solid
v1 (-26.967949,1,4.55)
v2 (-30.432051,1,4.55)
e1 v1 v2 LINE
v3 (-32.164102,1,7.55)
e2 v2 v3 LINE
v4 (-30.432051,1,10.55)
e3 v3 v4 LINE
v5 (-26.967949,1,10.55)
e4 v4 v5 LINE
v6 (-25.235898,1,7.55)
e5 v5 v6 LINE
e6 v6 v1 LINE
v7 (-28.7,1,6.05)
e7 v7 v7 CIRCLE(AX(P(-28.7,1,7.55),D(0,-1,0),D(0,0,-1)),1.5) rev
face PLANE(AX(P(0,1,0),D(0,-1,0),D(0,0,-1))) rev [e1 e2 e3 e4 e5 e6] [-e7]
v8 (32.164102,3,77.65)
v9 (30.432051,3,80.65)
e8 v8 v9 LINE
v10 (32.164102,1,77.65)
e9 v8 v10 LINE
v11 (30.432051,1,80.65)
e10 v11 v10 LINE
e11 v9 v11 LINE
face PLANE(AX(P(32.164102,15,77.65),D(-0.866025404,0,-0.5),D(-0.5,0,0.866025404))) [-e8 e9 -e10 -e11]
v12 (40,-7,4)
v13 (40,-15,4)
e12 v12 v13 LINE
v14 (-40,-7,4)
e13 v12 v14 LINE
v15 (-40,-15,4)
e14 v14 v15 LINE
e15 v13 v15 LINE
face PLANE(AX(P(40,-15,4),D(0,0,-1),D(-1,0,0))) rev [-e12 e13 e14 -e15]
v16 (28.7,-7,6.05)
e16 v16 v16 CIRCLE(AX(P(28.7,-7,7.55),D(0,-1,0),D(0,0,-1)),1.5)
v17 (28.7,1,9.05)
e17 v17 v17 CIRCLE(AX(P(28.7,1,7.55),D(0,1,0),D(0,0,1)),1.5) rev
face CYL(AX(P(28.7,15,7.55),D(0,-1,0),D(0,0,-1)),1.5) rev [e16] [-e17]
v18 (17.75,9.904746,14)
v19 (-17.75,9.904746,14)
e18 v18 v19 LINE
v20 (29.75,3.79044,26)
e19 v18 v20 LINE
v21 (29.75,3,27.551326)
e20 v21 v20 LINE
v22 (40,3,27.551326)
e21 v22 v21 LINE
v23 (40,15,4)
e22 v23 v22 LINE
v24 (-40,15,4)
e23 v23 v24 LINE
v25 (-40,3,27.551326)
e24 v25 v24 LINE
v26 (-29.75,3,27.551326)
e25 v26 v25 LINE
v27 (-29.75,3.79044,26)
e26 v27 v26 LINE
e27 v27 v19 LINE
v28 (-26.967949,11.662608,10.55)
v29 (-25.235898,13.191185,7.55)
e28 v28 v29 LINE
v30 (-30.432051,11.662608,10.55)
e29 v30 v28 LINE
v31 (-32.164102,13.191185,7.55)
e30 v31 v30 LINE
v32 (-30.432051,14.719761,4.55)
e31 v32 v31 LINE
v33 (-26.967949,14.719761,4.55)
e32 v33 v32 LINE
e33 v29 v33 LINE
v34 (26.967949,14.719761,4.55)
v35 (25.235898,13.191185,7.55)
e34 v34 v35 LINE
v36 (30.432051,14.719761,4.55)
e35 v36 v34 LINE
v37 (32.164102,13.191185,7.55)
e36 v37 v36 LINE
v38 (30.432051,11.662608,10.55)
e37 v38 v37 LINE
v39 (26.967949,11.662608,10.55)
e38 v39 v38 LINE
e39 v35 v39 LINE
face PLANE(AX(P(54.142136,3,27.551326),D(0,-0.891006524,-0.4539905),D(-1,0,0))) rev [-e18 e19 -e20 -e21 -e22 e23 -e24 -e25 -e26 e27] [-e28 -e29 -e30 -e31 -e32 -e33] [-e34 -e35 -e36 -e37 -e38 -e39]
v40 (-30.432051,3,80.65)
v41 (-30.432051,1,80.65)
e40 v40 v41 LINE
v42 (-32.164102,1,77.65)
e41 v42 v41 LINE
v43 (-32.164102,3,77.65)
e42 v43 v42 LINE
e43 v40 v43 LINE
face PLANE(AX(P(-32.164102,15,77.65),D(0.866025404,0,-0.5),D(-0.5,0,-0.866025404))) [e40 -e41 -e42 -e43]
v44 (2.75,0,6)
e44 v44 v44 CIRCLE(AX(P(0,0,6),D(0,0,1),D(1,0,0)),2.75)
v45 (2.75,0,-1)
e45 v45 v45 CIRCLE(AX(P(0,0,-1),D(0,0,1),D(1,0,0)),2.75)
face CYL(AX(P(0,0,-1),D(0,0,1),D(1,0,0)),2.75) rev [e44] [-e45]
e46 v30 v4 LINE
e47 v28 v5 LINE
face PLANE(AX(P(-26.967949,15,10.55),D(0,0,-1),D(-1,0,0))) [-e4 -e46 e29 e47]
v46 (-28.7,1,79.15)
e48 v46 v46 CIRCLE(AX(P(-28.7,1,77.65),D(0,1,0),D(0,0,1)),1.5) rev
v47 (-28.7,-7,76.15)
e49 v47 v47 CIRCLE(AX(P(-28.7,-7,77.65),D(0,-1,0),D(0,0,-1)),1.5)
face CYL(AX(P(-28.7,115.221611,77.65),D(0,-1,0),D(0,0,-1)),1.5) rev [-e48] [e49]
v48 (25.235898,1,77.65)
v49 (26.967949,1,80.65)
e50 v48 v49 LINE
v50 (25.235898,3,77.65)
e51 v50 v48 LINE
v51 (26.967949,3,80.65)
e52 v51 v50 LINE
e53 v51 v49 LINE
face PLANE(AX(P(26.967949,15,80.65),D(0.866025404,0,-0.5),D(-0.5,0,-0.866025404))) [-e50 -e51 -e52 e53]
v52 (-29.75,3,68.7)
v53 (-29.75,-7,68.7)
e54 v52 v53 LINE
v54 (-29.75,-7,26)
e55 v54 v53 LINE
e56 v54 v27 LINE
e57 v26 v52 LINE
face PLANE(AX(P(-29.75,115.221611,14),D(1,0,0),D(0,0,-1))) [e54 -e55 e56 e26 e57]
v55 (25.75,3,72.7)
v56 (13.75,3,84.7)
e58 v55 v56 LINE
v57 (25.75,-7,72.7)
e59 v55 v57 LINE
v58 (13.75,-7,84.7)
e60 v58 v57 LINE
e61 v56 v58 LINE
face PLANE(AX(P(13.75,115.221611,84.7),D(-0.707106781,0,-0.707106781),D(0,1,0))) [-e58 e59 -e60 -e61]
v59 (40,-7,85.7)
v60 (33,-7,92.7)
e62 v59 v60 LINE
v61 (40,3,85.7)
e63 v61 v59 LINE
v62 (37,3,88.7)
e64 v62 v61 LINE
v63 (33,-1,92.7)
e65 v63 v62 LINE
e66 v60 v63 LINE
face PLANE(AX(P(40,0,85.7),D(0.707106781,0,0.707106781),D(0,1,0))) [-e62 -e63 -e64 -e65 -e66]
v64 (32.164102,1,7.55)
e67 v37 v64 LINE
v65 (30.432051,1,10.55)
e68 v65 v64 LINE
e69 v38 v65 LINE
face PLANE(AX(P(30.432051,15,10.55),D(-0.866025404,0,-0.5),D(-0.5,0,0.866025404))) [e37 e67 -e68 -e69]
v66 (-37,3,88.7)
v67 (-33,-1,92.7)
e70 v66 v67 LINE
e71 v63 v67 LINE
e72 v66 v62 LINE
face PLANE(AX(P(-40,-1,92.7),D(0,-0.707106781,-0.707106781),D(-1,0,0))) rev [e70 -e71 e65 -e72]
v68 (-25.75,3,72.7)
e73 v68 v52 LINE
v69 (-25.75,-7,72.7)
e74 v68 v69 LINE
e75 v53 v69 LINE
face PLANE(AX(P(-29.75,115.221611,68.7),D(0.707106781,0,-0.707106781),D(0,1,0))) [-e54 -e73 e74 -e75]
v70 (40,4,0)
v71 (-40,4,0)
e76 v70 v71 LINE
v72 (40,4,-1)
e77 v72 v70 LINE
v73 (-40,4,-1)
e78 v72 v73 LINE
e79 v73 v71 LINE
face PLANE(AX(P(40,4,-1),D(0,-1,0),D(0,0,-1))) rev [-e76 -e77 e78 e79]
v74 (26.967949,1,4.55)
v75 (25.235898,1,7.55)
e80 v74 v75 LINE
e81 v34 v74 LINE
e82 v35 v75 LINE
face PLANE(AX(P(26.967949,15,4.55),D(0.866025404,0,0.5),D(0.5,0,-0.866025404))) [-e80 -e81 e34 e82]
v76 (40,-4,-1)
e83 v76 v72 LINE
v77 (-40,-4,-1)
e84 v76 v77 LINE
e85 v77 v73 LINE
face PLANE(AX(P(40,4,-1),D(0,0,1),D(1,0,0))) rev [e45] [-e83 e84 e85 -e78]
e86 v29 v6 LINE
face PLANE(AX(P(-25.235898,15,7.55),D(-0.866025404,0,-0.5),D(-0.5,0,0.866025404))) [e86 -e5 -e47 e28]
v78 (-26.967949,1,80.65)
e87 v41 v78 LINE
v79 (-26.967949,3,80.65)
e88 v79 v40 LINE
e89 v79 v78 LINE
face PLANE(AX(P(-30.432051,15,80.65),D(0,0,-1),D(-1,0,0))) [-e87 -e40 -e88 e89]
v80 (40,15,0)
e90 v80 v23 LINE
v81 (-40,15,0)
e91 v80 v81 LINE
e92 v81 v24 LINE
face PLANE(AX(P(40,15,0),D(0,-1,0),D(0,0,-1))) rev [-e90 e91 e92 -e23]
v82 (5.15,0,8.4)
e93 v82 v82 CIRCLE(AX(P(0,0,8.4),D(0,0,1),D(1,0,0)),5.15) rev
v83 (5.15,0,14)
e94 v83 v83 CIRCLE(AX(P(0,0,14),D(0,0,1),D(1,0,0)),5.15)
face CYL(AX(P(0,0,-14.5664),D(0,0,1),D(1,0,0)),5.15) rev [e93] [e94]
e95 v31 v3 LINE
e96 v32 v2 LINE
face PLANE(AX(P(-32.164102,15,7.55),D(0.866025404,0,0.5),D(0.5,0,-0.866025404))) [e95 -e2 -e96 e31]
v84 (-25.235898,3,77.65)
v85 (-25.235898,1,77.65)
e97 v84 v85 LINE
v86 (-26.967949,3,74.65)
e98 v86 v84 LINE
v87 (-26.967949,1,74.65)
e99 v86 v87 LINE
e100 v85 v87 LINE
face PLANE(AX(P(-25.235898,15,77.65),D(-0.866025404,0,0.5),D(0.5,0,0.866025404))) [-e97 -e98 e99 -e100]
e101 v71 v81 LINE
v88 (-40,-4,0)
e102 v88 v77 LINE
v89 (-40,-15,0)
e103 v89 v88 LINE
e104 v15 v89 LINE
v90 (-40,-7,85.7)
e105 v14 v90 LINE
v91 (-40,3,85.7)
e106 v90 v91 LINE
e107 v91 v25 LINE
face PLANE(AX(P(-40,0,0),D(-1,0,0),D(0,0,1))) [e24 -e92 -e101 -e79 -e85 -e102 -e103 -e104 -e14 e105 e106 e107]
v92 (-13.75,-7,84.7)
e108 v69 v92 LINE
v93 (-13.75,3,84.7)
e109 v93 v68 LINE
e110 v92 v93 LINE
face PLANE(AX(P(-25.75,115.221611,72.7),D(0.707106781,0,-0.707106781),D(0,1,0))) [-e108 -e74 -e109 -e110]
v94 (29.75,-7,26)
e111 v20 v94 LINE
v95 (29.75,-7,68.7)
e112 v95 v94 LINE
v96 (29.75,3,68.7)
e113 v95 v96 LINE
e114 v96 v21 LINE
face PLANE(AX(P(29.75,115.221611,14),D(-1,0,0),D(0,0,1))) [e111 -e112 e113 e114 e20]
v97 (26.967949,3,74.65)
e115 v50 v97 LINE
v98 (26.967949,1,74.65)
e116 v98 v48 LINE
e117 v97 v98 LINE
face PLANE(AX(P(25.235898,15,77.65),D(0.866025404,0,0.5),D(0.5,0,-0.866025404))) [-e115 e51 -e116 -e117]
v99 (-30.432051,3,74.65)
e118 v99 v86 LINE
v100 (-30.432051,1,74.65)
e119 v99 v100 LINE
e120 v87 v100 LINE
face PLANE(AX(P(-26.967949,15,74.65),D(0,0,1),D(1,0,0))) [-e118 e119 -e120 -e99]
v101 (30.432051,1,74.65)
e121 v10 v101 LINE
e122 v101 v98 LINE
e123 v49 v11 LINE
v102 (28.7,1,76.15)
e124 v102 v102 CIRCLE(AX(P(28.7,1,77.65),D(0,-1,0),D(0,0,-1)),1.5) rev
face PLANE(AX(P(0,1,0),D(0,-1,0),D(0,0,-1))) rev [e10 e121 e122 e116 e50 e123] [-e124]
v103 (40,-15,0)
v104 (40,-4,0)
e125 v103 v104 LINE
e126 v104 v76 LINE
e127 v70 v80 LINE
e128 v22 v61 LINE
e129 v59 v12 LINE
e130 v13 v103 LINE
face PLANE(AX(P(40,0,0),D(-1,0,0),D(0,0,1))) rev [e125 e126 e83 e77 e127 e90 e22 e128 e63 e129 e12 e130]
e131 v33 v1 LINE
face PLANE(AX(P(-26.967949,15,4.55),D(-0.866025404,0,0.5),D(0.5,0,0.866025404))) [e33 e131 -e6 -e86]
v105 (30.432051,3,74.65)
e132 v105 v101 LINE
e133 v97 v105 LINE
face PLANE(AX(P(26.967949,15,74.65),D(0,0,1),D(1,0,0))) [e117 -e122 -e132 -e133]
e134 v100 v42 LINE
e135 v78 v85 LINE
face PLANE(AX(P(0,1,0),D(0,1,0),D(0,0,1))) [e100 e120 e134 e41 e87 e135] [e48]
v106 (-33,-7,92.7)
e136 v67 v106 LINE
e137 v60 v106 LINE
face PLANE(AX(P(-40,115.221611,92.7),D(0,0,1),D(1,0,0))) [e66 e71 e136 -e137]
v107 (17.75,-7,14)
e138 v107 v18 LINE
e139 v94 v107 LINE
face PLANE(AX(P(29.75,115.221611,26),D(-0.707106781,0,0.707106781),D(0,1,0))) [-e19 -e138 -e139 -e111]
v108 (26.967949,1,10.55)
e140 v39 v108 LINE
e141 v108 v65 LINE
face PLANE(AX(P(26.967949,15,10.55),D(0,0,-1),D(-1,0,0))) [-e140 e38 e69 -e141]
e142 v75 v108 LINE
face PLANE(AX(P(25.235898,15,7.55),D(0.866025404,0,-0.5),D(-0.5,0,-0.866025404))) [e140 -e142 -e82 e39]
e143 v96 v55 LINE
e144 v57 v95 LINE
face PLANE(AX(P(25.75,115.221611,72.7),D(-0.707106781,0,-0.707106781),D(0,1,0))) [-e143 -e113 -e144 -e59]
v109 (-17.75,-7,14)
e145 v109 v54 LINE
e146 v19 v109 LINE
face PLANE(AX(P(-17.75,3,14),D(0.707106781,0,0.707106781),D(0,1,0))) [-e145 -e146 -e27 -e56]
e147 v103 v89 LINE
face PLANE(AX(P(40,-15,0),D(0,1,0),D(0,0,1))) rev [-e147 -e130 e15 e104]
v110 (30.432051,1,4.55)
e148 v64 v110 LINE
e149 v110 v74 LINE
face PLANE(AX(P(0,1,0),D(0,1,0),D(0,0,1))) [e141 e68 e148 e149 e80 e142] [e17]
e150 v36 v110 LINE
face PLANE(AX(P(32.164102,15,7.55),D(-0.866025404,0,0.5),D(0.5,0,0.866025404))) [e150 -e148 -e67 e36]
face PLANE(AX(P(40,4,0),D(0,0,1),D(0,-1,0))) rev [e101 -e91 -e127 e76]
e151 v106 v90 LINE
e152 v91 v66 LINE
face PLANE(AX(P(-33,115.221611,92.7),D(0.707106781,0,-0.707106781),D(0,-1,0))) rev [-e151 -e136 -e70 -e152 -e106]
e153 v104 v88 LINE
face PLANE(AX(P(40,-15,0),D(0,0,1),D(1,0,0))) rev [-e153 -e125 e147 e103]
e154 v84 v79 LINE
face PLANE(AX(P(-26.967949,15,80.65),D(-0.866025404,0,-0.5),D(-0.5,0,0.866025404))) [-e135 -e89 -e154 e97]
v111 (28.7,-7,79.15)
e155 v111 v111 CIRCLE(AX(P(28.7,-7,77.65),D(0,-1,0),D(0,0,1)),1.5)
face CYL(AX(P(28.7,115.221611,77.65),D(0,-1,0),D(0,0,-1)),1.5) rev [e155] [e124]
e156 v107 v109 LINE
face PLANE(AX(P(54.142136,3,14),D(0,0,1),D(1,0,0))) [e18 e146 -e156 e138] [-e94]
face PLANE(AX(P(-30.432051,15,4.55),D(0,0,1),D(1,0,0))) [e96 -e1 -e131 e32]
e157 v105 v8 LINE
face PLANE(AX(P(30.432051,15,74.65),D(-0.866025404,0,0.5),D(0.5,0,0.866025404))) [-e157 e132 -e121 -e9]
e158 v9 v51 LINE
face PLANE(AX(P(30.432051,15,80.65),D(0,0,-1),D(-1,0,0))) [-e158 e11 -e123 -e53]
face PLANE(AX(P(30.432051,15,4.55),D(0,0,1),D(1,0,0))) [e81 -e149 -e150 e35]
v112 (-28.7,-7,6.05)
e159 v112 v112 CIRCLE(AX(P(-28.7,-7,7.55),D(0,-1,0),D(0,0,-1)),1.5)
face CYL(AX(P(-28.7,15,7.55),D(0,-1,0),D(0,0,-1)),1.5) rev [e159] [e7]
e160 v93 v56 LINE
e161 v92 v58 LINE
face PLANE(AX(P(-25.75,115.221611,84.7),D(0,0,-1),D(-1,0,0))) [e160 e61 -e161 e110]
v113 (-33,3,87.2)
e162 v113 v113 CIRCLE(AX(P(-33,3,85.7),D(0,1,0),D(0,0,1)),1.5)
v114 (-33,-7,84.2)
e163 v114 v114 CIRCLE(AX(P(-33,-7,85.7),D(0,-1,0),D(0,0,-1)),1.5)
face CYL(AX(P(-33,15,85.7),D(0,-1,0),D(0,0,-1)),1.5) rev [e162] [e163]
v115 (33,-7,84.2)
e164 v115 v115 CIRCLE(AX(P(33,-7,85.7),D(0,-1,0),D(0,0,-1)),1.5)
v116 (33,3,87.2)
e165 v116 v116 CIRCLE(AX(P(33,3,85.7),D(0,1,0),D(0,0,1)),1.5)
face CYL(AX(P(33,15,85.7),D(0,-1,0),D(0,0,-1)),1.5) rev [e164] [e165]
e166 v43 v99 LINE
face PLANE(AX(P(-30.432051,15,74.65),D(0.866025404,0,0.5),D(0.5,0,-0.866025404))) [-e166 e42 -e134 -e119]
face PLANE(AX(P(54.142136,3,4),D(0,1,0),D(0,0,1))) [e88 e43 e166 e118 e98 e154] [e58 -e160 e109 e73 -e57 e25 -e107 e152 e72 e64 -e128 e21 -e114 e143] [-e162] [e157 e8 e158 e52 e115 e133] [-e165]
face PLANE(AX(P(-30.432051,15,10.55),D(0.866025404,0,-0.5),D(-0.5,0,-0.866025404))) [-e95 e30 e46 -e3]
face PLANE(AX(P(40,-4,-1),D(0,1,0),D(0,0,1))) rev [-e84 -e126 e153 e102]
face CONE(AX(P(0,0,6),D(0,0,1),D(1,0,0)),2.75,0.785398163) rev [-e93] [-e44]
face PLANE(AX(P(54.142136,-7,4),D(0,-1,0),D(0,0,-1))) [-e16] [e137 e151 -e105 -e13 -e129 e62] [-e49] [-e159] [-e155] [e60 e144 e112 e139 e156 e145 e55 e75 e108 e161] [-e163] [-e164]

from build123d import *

# Parameters (mm, degrees)
BOSS_EXTRUDE1_DEPTH     = 40
SKETCH2_W               = 10
SKETCH2_H               = 10
BOSS_EXTRUDE2_DEPTH     = 80
SKETCH3_R               = 1.5
CUT_EXTRUDE1_DEPTH      = 48.749345545
SKETCH4_R               = 1.5
BOSS_EXTRUDE3_DEPTH     = 10
CHAMFER1_SIZE           = 23.551326066
CHAMFER1_SIZE_2         = 12
CHAMFER2_SIZE           = 4
CHAMFER3_SIZE           = 4
CHAMFER4_SIZE           = 12
SKETCH7_R               = 1.5
CUT_EXTRUDE3_DEPTH      = 104.330973091
CUT_EXTRUDE2_DEPTH      = 103.553839519
CUT_EXTRUDE2_DEPTH_BACK = 2
CHAMFER5_SIZE           = 7
SKETCH8_R               = 5.15
CUT_EXTRUDE4_DEPTH      = 5.5
SKETCH9_R               = 2.75
CUT_EXTRUDE5_DEPTH      = 95.417371283
CHAMFER6_SIZE           = 2.5


# Some blends are built 0.0001 mm under size
with BuildPart() as part:
    # Sketch1 → Boss-Extrude1 (new, symmetric)
    with BuildSketch(Plane(origin=(0, 0, 0), x_dir=(0, 0, -1), z_dir=(1, 0, 0))):
        Polygon((0, 4), (0, 15), (-4, 15), (-4, -15), (0, -15), (0, -4), (1, -4), (1, 4), align=None)
    extrude(amount=BOSS_EXTRUDE1_DEPTH, both=True)

    # Sketch2 → Boss-Extrude2 (add)
    with BuildSketch(Plane.ZY.offset(40)):
        with Locations((9, -2)):
            Rectangle(SKETCH2_W, SKETCH2_H)
    extrude(amount=-BOSS_EXTRUDE2_DEPTH)

    # Sketch3 → Cut-Extrude1 (cut, through all)
    with BuildSketch(Plane.XZ.offset(7)):
        with Locations(Location((-28.7, 7.55, 0), (0, 0, 270))):
            Circle(SKETCH3_R)
        with Locations(Location((28.7, 7.55, 0), (0, 0, 270))):
            Circle(SKETCH3_R)
    extrude(amount=-CUT_EXTRUDE1_DEPTH, mode=Mode.SUBTRACT)

    # Sketch4 → Boss-Extrude3 (add)
    with BuildSketch(Plane.XZ.offset(7)):
        Polygon((-40, 14), (-29.75, 14), (-29.75, 72.7), (-25.75, 72.7), (-25.75, 84.7), (25.75, 84.7), (25.75, 72.7), (29.75, 72.7), (29.75, 14), (40, 14), (40, 92.7), (-40, 92.7), align=None)
        with Locations(Location((-28.7, 77.65, 0), (0, 0, 270))):
            Circle(SKETCH4_R, mode=Mode.SUBTRACT)
        with Locations(Location((28.7, 77.65, 0), (0, 0, 90))):
            Circle(SKETCH4_R, mode=Mode.SUBTRACT)
    extrude(amount=-BOSS_EXTRUDE3_DEPTH)

    # Chamfer1
    # the kernel refuses this chamfer: 23.551326066, 12 mm, written as the material it adds along each edge
    with BuildSketch(Plane(origin=(-40, 3, 4), x_dir=(0, -0.017531984409911095, 0.9998463029499337), z_dir=(1, 0, 0))) as chamfer1_piece_1_section:
        Polygon((CHAMFER1_SIZE * 0.999846302953, -CHAMFER1_SIZE * 0.01753198441), (-CHAMFER1_SIZE_2 * 0.0175319844099, -CHAMFER1_SIZE_2 * 0.99984630295), (0, 0), align=None)
    chamfer1_piece_1 = extrude(amount=80, mode=Mode.PRIVATE)
    chamfer1_piece_1 = split(chamfer1_piece_1, bisect_by=Plane(origin=(-34.875, 4.887878827, 14), z_dir=(0, 0, 1)), keep=Keep.TOP, mode=Mode.PRIVATE)
    chamfer1_piece_1 = split(chamfer1_piece_1, bisect_by=Plane(origin=(-29.75, 4.887878827, 19.058840597), z_dir=(-1, 0, 0)), keep=Keep.TOP, mode=Mode.PRIVATE)
    add(chamfer1_piece_1)
    with BuildSketch(Plane(origin=(-40, 3, 4), x_dir=(0, -0.017531984409911095, 0.9998463029499337), z_dir=(1, 0, 0))) as chamfer1_piece_2_section:
        Polygon((CHAMFER1_SIZE * 0.999846302953, -CHAMFER1_SIZE * 0.01753198441), (-CHAMFER1_SIZE_2 * 0.0175319844099, -CHAMFER1_SIZE_2 * 0.99984630295), (0, 0), align=None)
    chamfer1_piece_2 = extrude(amount=80, mode=Mode.PRIVATE)
    chamfer1_piece_2 = split(chamfer1_piece_2, bisect_by=Plane(origin=(-34.907327213, 7.791187199, 14), z_dir=(0, 0, -1)), keep=Keep.TOP, mode=Mode.PRIVATE)
    chamfer1_piece_2 = split(chamfer1_piece_2, bisect_by=Plane(origin=(-29.75, 7.791187199, 8.24071688), z_dir=(-1, 0, 0)), keep=Keep.TOP, mode=Mode.PRIVATE)
    chamfer1_piece_2 = chamfer1_piece_2 - Plane(origin=(-28.7, 7.791187199, 7.55), x_dir=(0, 0, -1), z_dir=(0, -1, 0)) * Cylinder(1.5, 255, mode=Mode.PRIVATE)
    chamfer1_piece_2 = split(chamfer1_piece_2, bisect_by=Plane(origin=(-34.907327213, 15, 8.24071688), z_dir=(0, -1, 0)), keep=Keep.TOP, mode=Mode.PRIVATE)
    add(chamfer1_piece_2)
    with BuildSketch(Plane(origin=(-40, 3, 4), x_dir=(0, -0.017531984409911095, 0.9998463029499337), z_dir=(1, 0, 0))) as chamfer1_piece_3_section:
        Polygon((CHAMFER1_SIZE * 0.999846302953, -CHAMFER1_SIZE * 0.01753198441), (-CHAMFER1_SIZE_2 * 0.0175319844099, -CHAMFER1_SIZE_2 * 0.99984630295), (0, 0), align=None)
    chamfer1_piece_3 = extrude(amount=80, mode=Mode.PRIVATE)
    chamfer1_piece_3 = split(chamfer1_piece_3, bisect_by=Plane(origin=(3.218e-06, 7.789653484, 14), z_dir=(0, 0, -1)), keep=Keep.TOP, mode=Mode.PRIVATE)
    chamfer1_piece_3 = split(chamfer1_piece_3, bisect_by=Plane(origin=(-29.75, 7.789653484, 8.251914963), z_dir=(1, 0, 0)), keep=Keep.TOP, mode=Mode.PRIVATE)
    chamfer1_piece_3 = split(chamfer1_piece_3, bisect_by=Plane(origin=(29.75, 7.789653484, 8.251914963), z_dir=(-1, 0, 0)), keep=Keep.TOP, mode=Mode.PRIVATE)
    chamfer1_piece_3 = chamfer1_piece_3 - Plane(origin=(28.7, 7.789653484, 7.55), x_dir=(0, 0, -1), z_dir=(0, -1, 0)) * Cylinder(1.5, 255, mode=Mode.PRIVATE)
    chamfer1_piece_3 = chamfer1_piece_3 - Plane(origin=(-28.7, 7.789653484, 7.55), x_dir=(0, 0, -1), z_dir=(0, -1, 0)) * Cylinder(1.5, 255, mode=Mode.PRIVATE)
    chamfer1_piece_3 = split(chamfer1_piece_3, bisect_by=Plane(origin=(3.218e-06, 15, 8.251914963), z_dir=(0, -1, 0)), keep=Keep.TOP, mode=Mode.PRIVATE)
    add(chamfer1_piece_3)
    with BuildSketch(Plane(origin=(-40, 3, 4), x_dir=(0, -0.017531984409911095, 0.9998463029499337), z_dir=(1, 0, 0))) as chamfer1_piece_4_section:
        Polygon((CHAMFER1_SIZE * 0.999846302953, -CHAMFER1_SIZE * 0.01753198441), (-CHAMFER1_SIZE_2 * 0.0175319844099, -CHAMFER1_SIZE_2 * 0.99984630295), (0, 0), align=None)
    chamfer1_piece_4 = extrude(amount=80, mode=Mode.PRIVATE)
    chamfer1_piece_4 = split(chamfer1_piece_4, bisect_by=Plane(origin=(34.875, 4.887878827, 14), z_dir=(0, 0, 1)), keep=Keep.TOP, mode=Mode.PRIVATE)
    chamfer1_piece_4 = split(chamfer1_piece_4, bisect_by=Plane(origin=(29.75, 4.887878827, 19.058840597), z_dir=(1, 0, 0)), keep=Keep.TOP, mode=Mode.PRIVATE)
    add(chamfer1_piece_4)
    with BuildSketch(Plane(origin=(-40, 3, 4), x_dir=(0, -0.017531984409911095, 0.9998463029499337), z_dir=(1, 0, 0))) as chamfer1_piece_5_section:
        Polygon((CHAMFER1_SIZE * 0.999846302953, -CHAMFER1_SIZE * 0.01753198441), (-CHAMFER1_SIZE_2 * 0.0175319844099, -CHAMFER1_SIZE_2 * 0.99984630295), (0, 0), align=None)
    chamfer1_piece_5 = extrude(amount=80, mode=Mode.PRIVATE)
    chamfer1_piece_5 = split(chamfer1_piece_5, bisect_by=Plane(origin=(34.907327332, 7.791187313, 14), z_dir=(0, 0, -1)), keep=Keep.TOP, mode=Mode.PRIVATE)
    chamfer1_piece_5 = split(chamfer1_piece_5, bisect_by=Plane(origin=(29.75, 7.791187313, 8.240716948), z_dir=(1, 0, 0)), keep=Keep.TOP, mode=Mode.PRIVATE)
    chamfer1_piece_5 = chamfer1_piece_5 - Plane(origin=(28.7, 7.791187313, 7.55), x_dir=(0, 0, -1), z_dir=(0, -1, 0)) * Cylinder(1.5, 255, mode=Mode.PRIVATE)
    chamfer1_piece_5 = split(chamfer1_piece_5, bisect_by=Plane(origin=(34.907327332, 15, 8.240716948), z_dir=(0, -1, 0)), keep=Keep.TOP, mode=Mode.PRIVATE)
    add(chamfer1_piece_5)

    # Chamfer2
    chamfer2_edges = [part.edges().sort_by_distance(p)[0] for p in [
        (-29.75, -2, 72.7),
        (29.75, -2, 72.7),
    ]]
    chamfer(chamfer2_edges, length=CHAMFER2_SIZE - 0.0001)  # a hair under: the kernel refuses the full size

    # Chamfer3
    chamfer3_edges = [part.edges().sort_by_distance(p)[0] for p in [
        (0, 3, 92.7),
    ]]
    chamfer(chamfer3_edges, length=CHAMFER3_SIZE)

    # Chamfer4
    chamfer4_edges = [part.edges().sort_by_distance(p)[0] for p in [
        (-25.75, -2, 84.7),
        (25.75, -2, 84.7),
        (29.75, 1.452372753, 14),
        (-29.75, 1.452372753, 14),
    ]]
    chamfer(chamfer4_edges, length=CHAMFER4_SIZE - 0.0001)  # a hair under: the kernel refuses the full size

    # Sketch7 → Cut-Extrude3 (cut, through all)
    with BuildSketch(Plane.XZ.offset(7)):
        with Locations(Location((-33, 85.7, 0), (0, 0, 270))):
            Circle(SKETCH7_R)
        with Locations(Location((33, 85.7, 0), (0, 0, 270))):
            Circle(SKETCH7_R)
    extrude(amount=-CUT_EXTRUDE3_DEPTH, mode=Mode.SUBTRACT)

    # Sketch5 → Cut-Extrude2 (cut, two sides: drawn at the far end of the back side and taken through both)
    with BuildSketch(Plane(origin=(0, 3, 0), x_dir=(1, 0, 0), z_dir=(0, 1, 0)).offset(-CUT_EXTRUDE2_DEPTH_BACK)):
        Polygon((32.164101615, -77.65), (30.432050808, -80.65), (26.967949192, -80.65), (25.235898385, -77.65), (26.967949192, -74.65), (30.432050808, -74.65), align=None)
        Polygon((-26.967949192, -74.65), (-30.432050808, -74.65), (-32.164101615, -77.65), (-30.432050808, -80.65), (-26.967949192, -80.65), (-25.235898385, -77.65), align=None)
        Polygon((-25.235898385, -7.55), (-26.967949192, -10.55), (-30.432050808, -10.55), (-32.164101615, -7.55), (-30.432050808, -4.55), (-26.967949192, -4.55), align=None)
        Polygon((26.967949192, -10.55), (30.432050808, -10.55), (32.164101615, -7.55), (30.432050808, -4.55), (26.967949192, -4.55), (25.235898385, -7.55), align=None)
    extrude(amount=CUT_EXTRUDE2_DEPTH + CUT_EXTRUDE2_DEPTH_BACK, mode=Mode.SUBTRACT)

    # Chamfer5
    chamfer5_edges = [part.edges().sort_by_distance(p)[0] for p in [
        (-40, -4, 92.7),
        (40, -4, 92.7),
    ]]
    chamfer(chamfer5_edges, length=CHAMFER5_SIZE)

    # Sketch8 → Cut-Extrude4 (cut)
    with BuildSketch(Plane.XY.offset(14)):
        Circle(SKETCH8_R)
    extrude(amount=-CUT_EXTRUDE4_DEPTH, mode=Mode.SUBTRACT)

    # Sketch9 → Cut-Extrude5 (cut, through all)
    with BuildSketch(Plane.XY.offset(8.5)):
        Circle(SKETCH9_R)
    extrude(amount=-CUT_EXTRUDE5_DEPTH, mode=Mode.SUBTRACT)

    # Chamfer6
    # the kernel refuses this chamfer: 2.5 mm, written as the material it takes off along each edge
    with BuildSketch(Plane(origin=(0, 0, 8.5), x_dir=(1, 0, 0), z_dir=(0, -1, 0))) as chamfer6_piece_1_section:
        Polygon((2.75, -CHAMFER6_SIZE), (2.75 + CHAMFER6_SIZE, 0), (2.75, 0), align=None)
    chamfer6_piece_1 = revolve(axis=Axis((0, 0, 8.5), (0, 0, 1)), mode=Mode.PRIVATE)
    chamfer6_piece_1 = chamfer6_piece_1 & Plane(origin=(0, 0, 7.19466401), x_dir=(1, 0, 0), z_dir=(0, 0, 1)) * Cylinder(5.15, 21, mode=Mode.PRIVATE)
    add(chamfer6_piece_1, mode=Mode.SUBTRACT)


solid = part.part
